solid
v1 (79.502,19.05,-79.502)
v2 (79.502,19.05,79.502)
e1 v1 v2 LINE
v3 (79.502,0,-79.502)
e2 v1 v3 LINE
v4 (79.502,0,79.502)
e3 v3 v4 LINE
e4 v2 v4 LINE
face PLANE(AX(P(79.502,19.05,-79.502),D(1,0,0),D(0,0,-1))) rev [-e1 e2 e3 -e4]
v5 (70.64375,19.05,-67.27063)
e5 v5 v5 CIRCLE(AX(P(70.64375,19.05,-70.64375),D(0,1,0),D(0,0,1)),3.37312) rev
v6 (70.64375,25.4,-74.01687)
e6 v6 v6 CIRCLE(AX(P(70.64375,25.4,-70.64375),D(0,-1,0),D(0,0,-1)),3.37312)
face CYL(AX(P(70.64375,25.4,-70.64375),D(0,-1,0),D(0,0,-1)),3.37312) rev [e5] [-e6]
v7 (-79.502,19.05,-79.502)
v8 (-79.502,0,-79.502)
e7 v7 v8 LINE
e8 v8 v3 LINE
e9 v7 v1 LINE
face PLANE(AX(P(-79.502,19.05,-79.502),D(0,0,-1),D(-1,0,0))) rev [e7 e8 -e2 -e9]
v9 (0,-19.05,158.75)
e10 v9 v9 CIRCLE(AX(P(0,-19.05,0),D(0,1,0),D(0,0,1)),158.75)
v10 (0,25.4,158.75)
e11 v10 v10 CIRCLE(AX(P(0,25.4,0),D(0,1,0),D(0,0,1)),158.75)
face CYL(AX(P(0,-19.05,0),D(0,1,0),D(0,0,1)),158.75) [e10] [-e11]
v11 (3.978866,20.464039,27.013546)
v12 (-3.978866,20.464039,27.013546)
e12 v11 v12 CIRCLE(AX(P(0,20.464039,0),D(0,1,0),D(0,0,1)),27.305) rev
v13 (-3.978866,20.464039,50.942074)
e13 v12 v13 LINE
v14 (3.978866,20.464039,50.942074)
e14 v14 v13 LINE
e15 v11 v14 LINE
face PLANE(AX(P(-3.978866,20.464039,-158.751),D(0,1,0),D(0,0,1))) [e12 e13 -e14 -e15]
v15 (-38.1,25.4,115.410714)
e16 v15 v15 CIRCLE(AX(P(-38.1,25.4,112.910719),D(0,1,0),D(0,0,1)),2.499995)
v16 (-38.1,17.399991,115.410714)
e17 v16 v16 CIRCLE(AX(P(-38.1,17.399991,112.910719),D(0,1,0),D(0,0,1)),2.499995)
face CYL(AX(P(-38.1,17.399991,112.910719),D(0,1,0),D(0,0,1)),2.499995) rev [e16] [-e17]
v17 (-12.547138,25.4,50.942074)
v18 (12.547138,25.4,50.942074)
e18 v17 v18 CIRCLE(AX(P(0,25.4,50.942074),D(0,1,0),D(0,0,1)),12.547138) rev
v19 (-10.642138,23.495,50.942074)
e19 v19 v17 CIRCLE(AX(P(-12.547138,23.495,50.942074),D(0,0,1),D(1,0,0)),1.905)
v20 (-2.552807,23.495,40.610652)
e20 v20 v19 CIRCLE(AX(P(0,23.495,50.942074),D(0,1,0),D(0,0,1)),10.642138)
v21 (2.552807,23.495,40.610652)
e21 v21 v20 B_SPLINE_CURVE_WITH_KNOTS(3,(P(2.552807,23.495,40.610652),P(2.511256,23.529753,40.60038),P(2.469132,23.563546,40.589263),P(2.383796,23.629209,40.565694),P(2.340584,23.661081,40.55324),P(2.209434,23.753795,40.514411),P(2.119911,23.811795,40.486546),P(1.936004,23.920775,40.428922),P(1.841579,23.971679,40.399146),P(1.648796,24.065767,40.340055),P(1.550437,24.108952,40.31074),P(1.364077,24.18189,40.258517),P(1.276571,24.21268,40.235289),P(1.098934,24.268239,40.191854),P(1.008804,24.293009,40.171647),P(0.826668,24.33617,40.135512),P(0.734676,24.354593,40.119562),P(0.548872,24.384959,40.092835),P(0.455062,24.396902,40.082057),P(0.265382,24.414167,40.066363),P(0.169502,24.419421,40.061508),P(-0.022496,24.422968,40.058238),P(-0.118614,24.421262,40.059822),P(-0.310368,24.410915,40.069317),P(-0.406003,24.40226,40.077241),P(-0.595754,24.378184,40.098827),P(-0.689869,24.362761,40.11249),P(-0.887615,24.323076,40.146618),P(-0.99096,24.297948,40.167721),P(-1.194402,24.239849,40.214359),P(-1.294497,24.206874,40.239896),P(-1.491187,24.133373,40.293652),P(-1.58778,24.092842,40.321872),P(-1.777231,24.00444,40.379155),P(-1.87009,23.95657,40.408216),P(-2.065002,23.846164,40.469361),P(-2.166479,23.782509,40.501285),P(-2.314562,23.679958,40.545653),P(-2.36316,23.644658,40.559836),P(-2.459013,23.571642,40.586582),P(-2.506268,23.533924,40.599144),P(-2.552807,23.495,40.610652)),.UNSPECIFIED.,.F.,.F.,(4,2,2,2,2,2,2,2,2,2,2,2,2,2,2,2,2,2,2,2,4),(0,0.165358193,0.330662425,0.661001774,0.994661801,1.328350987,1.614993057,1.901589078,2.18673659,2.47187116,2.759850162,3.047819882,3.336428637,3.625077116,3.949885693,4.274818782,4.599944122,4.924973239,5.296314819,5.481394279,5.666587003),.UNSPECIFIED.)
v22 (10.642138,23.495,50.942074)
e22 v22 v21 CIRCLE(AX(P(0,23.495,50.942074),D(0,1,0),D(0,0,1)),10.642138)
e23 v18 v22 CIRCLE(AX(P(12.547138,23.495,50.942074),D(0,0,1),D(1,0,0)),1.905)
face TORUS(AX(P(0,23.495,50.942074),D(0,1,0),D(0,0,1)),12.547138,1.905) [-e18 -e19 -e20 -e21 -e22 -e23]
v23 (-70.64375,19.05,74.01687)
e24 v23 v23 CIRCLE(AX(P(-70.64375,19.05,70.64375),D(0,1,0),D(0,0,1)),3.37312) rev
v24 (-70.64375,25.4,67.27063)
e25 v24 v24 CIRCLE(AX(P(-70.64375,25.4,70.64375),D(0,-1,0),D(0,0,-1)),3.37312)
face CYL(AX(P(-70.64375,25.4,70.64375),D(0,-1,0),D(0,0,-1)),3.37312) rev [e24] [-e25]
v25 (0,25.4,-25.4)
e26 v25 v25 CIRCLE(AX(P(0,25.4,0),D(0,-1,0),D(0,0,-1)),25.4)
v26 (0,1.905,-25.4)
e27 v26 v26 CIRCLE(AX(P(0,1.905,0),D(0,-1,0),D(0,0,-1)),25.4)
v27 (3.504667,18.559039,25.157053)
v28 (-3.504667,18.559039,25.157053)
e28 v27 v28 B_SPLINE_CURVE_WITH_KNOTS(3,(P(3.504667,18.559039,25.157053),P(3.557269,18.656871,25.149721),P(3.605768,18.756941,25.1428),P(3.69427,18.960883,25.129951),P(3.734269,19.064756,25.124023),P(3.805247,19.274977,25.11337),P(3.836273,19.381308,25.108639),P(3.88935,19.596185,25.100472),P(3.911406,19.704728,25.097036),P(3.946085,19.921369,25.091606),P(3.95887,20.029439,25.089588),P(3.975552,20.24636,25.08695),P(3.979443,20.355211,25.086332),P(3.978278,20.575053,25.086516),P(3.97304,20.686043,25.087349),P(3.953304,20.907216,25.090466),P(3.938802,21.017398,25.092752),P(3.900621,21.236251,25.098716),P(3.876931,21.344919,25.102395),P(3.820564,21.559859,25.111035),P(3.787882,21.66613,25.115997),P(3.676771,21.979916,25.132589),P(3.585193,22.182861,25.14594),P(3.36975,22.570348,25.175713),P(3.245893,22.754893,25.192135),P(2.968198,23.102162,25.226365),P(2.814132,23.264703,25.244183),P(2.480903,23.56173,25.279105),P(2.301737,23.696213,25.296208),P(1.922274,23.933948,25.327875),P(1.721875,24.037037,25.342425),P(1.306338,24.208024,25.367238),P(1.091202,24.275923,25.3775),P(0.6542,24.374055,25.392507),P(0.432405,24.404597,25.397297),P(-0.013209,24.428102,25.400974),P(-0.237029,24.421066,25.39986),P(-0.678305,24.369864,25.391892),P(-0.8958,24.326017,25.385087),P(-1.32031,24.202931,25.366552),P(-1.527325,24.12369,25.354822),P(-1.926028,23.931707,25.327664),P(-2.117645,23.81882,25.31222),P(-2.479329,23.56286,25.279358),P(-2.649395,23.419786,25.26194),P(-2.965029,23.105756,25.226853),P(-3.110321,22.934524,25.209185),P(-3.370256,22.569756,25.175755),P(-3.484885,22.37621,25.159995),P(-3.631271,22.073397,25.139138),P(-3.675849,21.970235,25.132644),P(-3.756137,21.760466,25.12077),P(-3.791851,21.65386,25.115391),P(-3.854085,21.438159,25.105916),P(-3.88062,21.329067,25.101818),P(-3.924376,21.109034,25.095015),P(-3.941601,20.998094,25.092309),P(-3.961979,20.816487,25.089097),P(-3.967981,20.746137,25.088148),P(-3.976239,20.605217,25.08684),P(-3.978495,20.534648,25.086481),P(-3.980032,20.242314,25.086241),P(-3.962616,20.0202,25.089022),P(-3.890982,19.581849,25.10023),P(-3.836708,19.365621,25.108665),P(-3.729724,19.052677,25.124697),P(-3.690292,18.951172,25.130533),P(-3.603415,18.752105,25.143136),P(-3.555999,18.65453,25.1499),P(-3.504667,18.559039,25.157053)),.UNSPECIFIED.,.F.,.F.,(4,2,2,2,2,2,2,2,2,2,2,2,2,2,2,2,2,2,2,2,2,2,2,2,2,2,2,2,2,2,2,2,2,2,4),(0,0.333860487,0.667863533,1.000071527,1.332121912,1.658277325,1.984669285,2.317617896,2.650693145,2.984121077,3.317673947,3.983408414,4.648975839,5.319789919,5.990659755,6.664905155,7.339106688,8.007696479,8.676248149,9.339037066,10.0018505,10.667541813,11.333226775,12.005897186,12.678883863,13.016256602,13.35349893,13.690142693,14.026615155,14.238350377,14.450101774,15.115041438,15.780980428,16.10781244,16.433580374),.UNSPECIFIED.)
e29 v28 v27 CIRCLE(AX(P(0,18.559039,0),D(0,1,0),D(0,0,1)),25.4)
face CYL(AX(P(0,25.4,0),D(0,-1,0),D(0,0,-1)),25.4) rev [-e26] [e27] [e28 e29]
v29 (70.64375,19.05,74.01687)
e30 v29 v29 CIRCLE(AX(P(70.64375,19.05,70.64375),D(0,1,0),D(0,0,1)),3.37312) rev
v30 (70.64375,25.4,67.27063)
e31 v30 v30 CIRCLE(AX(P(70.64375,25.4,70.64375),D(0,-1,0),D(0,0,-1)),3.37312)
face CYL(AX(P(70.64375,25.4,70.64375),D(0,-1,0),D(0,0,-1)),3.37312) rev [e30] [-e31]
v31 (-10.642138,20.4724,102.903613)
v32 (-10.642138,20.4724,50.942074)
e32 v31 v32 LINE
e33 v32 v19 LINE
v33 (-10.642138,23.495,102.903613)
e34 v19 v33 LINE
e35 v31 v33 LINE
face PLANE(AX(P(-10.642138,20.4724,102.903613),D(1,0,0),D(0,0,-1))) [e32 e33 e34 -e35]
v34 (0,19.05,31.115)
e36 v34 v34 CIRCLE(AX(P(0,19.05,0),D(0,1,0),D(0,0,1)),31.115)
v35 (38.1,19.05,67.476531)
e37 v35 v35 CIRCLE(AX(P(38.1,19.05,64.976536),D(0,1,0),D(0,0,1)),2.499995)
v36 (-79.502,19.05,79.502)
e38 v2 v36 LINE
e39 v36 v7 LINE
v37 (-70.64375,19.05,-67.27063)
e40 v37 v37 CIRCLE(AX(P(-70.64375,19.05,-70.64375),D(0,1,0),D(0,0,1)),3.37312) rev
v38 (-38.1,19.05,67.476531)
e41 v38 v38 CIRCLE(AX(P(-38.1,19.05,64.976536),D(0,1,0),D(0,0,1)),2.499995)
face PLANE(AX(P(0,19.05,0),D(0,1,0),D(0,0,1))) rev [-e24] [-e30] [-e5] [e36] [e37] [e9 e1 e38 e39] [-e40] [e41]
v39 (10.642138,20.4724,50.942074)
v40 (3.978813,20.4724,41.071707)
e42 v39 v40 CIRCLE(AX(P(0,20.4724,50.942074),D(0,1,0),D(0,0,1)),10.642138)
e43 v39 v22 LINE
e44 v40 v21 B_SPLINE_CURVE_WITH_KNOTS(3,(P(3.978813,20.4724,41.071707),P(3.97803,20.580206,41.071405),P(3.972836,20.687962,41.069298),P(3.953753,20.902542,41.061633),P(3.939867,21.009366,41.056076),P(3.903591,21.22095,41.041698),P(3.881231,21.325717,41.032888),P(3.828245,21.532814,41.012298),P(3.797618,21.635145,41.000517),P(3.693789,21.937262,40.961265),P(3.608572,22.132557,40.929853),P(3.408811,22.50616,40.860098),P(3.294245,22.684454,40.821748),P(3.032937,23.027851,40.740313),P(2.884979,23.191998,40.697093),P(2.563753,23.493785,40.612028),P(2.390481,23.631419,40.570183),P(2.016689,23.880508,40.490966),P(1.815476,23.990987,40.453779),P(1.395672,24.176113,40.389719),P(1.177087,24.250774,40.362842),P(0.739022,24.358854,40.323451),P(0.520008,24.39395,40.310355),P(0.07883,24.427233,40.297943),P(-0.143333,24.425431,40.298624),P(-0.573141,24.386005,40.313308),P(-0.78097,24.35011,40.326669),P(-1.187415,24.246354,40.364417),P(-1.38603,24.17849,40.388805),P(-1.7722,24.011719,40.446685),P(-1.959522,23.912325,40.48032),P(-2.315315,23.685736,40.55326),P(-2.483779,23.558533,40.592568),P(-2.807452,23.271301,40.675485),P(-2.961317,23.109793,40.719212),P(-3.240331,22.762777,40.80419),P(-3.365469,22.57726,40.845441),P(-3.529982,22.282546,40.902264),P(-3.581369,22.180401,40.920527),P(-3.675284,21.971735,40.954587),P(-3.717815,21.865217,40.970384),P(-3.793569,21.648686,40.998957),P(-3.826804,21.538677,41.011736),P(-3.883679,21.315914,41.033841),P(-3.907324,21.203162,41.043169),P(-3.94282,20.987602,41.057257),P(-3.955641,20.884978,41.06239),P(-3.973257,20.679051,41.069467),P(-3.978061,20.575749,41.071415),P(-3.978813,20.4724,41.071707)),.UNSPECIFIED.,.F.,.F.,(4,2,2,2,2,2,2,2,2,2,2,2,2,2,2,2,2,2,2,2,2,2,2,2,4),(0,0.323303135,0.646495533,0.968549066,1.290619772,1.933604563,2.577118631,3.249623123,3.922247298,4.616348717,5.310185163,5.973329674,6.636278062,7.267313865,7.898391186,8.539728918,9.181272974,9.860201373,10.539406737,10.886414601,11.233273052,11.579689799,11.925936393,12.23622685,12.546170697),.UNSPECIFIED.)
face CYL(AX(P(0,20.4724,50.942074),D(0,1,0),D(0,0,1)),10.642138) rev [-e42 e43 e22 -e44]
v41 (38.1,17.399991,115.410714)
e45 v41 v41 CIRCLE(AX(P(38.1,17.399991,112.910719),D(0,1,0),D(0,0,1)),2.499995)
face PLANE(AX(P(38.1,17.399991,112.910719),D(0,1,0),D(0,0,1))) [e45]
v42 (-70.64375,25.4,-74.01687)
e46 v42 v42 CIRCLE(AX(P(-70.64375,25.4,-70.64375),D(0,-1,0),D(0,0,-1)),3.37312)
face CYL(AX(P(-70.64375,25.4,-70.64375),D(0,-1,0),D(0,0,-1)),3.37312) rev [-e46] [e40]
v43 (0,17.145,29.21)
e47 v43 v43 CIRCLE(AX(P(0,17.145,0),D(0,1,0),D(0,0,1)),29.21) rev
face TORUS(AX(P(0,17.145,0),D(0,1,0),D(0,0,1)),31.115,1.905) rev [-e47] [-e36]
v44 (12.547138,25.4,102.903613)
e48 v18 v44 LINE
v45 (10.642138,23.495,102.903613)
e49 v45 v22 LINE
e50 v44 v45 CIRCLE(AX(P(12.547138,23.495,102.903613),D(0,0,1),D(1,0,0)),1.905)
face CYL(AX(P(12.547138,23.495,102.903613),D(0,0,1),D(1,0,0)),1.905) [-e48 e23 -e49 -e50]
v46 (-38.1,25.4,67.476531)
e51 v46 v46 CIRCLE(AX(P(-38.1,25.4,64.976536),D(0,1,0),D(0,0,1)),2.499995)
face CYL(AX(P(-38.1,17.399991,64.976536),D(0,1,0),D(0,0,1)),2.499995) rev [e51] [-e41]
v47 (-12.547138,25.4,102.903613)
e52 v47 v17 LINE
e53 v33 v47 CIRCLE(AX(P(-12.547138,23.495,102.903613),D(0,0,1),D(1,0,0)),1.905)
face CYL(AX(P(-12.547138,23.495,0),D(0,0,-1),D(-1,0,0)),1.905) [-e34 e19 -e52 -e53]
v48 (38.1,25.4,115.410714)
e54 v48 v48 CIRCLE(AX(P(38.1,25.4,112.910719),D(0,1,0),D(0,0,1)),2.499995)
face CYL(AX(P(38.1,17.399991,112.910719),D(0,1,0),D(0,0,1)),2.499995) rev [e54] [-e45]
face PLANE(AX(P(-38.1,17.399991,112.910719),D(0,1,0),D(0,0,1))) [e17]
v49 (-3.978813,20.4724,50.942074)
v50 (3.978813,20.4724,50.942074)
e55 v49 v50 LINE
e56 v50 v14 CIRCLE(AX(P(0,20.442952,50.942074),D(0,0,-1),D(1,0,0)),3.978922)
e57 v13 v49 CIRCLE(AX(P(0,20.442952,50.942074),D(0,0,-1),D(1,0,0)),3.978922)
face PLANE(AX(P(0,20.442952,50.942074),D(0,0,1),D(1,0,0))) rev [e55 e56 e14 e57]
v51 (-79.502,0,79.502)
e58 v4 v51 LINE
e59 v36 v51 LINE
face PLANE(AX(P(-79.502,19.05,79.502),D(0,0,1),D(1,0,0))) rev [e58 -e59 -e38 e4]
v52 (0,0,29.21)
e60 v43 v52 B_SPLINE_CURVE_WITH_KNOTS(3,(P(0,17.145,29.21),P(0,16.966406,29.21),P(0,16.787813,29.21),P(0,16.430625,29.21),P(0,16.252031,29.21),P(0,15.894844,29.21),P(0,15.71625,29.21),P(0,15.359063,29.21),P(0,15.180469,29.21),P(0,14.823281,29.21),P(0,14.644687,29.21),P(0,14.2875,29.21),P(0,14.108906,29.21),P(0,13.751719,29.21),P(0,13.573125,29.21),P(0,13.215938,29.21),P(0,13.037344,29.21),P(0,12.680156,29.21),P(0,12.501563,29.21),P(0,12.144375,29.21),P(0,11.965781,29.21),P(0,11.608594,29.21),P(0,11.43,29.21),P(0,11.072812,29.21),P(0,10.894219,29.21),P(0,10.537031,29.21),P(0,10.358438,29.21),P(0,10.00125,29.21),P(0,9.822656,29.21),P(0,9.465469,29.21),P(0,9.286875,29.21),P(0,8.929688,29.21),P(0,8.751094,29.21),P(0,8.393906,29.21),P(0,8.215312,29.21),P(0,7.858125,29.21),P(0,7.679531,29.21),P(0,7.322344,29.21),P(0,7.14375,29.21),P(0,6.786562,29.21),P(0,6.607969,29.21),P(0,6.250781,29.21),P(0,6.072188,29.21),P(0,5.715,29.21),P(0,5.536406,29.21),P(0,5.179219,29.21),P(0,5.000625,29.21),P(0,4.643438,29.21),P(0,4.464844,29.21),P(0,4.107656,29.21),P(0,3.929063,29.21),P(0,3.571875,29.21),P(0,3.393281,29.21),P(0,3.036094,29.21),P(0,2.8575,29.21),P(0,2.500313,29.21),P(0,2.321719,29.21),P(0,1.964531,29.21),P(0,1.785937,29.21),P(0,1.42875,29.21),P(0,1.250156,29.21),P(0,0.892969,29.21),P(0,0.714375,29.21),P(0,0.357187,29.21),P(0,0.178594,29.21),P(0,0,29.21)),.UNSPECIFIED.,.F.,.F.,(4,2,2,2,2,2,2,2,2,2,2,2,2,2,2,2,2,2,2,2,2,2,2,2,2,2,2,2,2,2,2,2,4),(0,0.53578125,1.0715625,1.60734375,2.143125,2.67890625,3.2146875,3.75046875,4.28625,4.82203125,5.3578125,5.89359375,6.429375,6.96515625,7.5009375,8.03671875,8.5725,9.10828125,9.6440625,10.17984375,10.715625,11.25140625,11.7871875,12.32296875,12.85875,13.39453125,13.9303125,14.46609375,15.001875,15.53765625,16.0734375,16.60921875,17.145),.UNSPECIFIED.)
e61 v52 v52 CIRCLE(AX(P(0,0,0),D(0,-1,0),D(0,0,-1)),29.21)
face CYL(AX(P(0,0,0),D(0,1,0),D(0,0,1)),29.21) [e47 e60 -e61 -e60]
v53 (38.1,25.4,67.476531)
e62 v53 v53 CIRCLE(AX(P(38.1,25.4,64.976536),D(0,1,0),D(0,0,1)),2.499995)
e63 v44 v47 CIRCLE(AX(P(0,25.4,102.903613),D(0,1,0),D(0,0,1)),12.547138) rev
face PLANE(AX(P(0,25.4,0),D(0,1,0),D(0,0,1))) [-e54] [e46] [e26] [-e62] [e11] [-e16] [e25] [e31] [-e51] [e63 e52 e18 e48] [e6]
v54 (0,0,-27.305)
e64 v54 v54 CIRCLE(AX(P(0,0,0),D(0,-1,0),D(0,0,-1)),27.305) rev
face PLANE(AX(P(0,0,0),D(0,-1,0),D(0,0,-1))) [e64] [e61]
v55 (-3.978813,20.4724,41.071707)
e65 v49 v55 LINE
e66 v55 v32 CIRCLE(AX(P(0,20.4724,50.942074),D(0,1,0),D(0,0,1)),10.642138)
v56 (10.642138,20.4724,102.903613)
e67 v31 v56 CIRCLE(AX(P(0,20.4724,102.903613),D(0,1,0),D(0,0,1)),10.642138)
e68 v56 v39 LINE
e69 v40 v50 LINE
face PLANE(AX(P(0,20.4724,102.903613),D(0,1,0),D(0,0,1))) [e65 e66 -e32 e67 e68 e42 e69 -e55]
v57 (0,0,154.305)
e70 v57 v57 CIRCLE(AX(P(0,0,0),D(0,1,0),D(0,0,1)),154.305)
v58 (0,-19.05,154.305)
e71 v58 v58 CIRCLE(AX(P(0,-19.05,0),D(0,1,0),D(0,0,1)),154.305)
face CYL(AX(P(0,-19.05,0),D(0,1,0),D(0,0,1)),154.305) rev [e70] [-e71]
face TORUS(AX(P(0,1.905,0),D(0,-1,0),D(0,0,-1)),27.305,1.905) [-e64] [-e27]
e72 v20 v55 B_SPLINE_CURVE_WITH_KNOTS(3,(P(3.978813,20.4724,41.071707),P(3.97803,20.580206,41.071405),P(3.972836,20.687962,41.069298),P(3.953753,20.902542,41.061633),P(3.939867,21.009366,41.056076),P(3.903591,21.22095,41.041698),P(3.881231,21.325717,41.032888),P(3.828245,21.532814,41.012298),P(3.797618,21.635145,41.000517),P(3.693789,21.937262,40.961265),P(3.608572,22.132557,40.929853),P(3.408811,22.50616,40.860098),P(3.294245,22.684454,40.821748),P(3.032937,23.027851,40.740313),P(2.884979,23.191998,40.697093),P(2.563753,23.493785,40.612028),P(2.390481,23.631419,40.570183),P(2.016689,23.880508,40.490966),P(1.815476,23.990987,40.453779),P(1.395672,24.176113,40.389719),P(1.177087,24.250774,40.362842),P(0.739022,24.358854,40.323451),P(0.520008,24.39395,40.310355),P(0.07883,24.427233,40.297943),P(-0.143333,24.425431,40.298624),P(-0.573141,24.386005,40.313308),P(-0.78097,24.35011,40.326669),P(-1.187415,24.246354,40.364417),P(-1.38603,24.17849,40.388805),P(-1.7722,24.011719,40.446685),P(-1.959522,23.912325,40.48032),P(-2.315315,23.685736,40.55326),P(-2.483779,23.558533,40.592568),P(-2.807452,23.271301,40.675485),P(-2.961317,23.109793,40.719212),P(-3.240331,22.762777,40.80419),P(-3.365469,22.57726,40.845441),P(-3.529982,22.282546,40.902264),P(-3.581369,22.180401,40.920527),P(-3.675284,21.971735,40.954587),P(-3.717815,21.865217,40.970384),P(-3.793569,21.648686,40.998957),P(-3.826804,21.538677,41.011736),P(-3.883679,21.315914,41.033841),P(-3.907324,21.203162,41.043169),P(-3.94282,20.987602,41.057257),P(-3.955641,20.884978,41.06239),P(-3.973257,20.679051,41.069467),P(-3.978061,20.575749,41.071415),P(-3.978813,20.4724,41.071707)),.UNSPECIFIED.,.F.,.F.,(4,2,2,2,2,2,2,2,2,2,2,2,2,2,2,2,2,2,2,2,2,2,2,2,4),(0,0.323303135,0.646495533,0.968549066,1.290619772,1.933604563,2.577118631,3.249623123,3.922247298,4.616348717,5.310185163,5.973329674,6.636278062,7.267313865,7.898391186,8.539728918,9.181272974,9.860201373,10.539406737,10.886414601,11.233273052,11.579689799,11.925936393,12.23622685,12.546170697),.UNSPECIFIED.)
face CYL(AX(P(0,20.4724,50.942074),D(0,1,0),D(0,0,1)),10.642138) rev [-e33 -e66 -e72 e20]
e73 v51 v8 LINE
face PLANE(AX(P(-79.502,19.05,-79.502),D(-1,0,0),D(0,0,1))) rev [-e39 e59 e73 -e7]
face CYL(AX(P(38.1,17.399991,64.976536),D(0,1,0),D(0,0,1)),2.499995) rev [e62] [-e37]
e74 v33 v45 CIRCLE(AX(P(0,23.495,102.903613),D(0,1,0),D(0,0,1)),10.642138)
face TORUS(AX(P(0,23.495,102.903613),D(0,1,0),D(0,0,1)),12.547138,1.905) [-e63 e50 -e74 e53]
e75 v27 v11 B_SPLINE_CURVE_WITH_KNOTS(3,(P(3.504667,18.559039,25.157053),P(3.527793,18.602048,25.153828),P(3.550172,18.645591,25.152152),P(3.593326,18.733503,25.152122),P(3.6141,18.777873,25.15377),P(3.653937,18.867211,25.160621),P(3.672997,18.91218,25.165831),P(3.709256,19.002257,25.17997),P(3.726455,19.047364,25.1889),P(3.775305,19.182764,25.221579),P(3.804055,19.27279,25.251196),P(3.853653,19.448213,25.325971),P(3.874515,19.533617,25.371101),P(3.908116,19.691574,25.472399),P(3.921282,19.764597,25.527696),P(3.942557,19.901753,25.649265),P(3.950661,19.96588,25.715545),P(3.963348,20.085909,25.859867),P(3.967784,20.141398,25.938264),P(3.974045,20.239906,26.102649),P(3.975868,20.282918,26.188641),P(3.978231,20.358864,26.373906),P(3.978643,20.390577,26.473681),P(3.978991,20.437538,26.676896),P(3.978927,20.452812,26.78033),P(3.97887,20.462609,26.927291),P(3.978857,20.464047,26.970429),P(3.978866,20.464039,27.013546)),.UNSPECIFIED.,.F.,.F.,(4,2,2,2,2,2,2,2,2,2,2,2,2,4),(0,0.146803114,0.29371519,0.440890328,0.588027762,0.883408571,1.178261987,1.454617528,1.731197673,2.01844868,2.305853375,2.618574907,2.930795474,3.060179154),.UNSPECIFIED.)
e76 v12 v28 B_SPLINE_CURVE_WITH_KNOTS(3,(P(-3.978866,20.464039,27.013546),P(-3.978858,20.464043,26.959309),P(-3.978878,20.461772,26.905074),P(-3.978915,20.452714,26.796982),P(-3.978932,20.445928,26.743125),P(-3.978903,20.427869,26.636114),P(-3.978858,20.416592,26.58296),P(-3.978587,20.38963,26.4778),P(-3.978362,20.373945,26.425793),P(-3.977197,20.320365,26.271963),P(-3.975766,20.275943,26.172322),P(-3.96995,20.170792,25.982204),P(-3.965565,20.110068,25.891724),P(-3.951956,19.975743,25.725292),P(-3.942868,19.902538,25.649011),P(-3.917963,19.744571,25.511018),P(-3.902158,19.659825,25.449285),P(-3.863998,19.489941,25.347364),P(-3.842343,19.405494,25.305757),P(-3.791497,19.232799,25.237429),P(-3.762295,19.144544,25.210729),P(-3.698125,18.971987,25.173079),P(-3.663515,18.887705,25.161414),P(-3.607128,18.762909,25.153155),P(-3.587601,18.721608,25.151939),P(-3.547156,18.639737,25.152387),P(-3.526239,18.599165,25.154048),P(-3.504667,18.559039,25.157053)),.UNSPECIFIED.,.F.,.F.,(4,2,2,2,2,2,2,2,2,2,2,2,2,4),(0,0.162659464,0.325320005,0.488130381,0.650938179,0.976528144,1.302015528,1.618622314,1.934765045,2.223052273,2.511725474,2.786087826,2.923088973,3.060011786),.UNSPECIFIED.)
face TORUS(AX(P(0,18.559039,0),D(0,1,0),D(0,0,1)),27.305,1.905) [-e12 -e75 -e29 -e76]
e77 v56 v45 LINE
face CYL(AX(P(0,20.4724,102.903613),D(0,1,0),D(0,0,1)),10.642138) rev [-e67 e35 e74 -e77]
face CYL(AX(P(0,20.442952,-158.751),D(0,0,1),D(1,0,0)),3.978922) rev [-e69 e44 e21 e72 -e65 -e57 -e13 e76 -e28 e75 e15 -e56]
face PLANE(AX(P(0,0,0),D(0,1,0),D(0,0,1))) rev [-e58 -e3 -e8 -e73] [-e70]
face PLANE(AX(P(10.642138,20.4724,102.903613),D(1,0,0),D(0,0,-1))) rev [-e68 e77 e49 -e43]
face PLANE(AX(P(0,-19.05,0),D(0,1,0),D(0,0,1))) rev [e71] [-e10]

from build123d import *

# Parameters (mm, degrees)
SKETCH1_R               = 154.305
BOSS_EXTRUDE1_DEPTH     = 25.4
SKETCH3_R               = 3.37312
CUT_EXTRUDE1_DEPTH      = 276.403891776
SKETCH5_R               = 25.4
CUT_EXTRUDE2_DEPTH      = 276.403891776
SKETCH6_W               = 159.004
SKETCH6_H               = 159.004
CUT_EXTRUDE3_DEPTH      = 19.05
BOSS_EXTRUDE2_START     = -19.05
SKETCH7_R               = 158.75
SKETCH7_R_2             = 154.305
BOSS_EXTRUDE2_DEPTH     = 44.45
CUT_EXTRUDE4_DEPTH      = 4.9276
CUT_EXTRUDE8_REACH      = 266.23
CUT_EXTRUDE8_END_RADIUS = 25.4
SKETCH11_R              = 2.499995
CUT_EXTRUDE9_DEPTH      = 8.0000094
BOSS_EXTRUDE3_START     = 19.05
SKETCH12_R              = 29.21
SKETCH12_R_2            = 25.4
BOSS_EXTRUDE3_DEPTH     = 19.05
FILLET1_R               = 1.905


with BuildPart() as part:
    # Sketch1 → Boss-Extrude1 (new body)
    with BuildSketch(Plane(origin=(0, 0, 0), x_dir=(1, 0, 0), z_dir=(0, 1, 0))):
        with Locations(Location((0, 0, 0), (0, 0, 270))):
            Circle(SKETCH1_R)
    extrude(amount=BOSS_EXTRUDE1_DEPTH)

    # Sketch3 → Cut-Extrude1 (cut, through all)
    with BuildSketch(Plane(origin=(3.2638069, 0, 70.137007426), x_dir=(-1, 0, 0), z_dir=(0, -1, 0))):
        with Locations(Location((-67.3799431, 140.780757426, 0), (0, 0, 90))):
            Circle(SKETCH3_R)
        with Locations(Location((73.9075569, 140.780757426, 0), (0, 0, 90))):
            Circle(SKETCH3_R)
        with Locations(Location((73.9075569, -0.506742574, 0), (0, 0, 90))):
            Circle(SKETCH3_R)
        with Locations(Location((-67.3799431, -0.506742574, 0), (0, 0, 90))):
            Circle(SKETCH3_R)
    extrude(amount=-CUT_EXTRUDE1_DEPTH, mode=Mode.SUBTRACT)

    # Sketch5 → Cut-Extrude2 (cut, through all)
    with BuildSketch(Plane(origin=(3.2638069, 0, 70.137007426), x_dir=(-1, 0, 0), z_dir=(0, -1, 0))):
        with Locations(Location((3.2638069, 70.137007426, 0), (0, 0, 90))):
            Circle(SKETCH5_R)
    extrude(amount=-CUT_EXTRUDE2_DEPTH, mode=Mode.SUBTRACT)

    # Sketch6 → Cut-Extrude3 (cut)
    with BuildSketch(Plane.XZ):
        Rectangle(SKETCH6_W, SKETCH6_H)
    extrude(amount=-CUT_EXTRUDE3_DEPTH, mode=Mode.SUBTRACT)

    # Sketch7 → Boss-Extrude2 (add)
    with BuildSketch(Plane(origin=(0, 0, 0), x_dir=(1, 0, 0), z_dir=(0, 1, 0)).offset(BOSS_EXTRUDE2_START)):
        with Locations(Location((0, 0, 0), (0, 0, 270))):
            Circle(SKETCH7_R)
        with Locations(Location((0, 0, 0), (0, 0, 270))):
            Circle(SKETCH7_R_2, mode=Mode.SUBTRACT)
    extrude(amount=BOSS_EXTRUDE2_DEPTH)

    # Sketch8 → Cut-Extrude4 (cut)
    with BuildSketch(Plane(origin=(0, 25.4, 0), x_dir=(1, 0, 0), z_dir=(0, 1, 0))):
        with BuildLine():
            Line((-10.642138235, -102.903613136), (-10.642138235, -50.942074053))
            ThreePointArc((-10.642138235, -50.942074053), (0, -40.299935817), (10.642138235, -50.942074053))
            Line((10.642138235, -50.942074053), (10.642138235, -102.903613136))
            ThreePointArc((10.642138235, -102.903613136), (0, -113.545751371), (-10.642138235, -102.903613136))
        make_face()
    extrude(amount=-CUT_EXTRUDE4_DEPTH, mode=Mode.SUBTRACT)

    # Cut-Extrude8: up to this cylinder (the profile starts outside it)
    cut_extrude8_end = Plane(origin=(0, 22.143059, 0), z_dir=(0, -1, 0)) * Cylinder(CUT_EXTRUDE8_END_RADIUS, 584.26, mode=Mode.PRIVATE)
    # Sketch10 → Cut-Extrude8 (cut, up to the surface)
    with BuildSketch(Plane(origin=(0, 0, 50.942074053), x_dir=(-1, 0, 0), z_dir=(0, 0, -1)), mode=Mode.PRIVATE) as cut_extrude8_sk1:
        with BuildLine():
            Line((3.978866006, 20.464038844), (-3.978866006, 20.464038844))
            ThreePointArc((-3.978866006, 20.464038844), (0, 24.421873778), (3.978866006, 20.464038844))
        make_face()
    cut_extrude8_tool1 = extrude(cut_extrude8_sk1.sketch, amount=CUT_EXTRUDE8_REACH, mode=Mode.PRIVATE) - cut_extrude8_end
    add(cut_extrude8_tool1.solids().sort_by_distance((0, 22.143059, 50.942074))[0], mode=Mode.SUBTRACT)

    # Sketch11 → Cut-Extrude9 (cut)
    with BuildSketch(Plane(origin=(0, 25.4, 0), x_dir=(1, 0, 0), z_dir=(0, 1, 0))):
        with Locations(Location((-38.1, -64.976536144, 0), (0, 0, 270))):
            Circle(SKETCH11_R)
        with Locations(Location((38.1, -64.976536144, 0), (0, 0, 270))):
            Circle(SKETCH11_R)
        with Locations(Location((38.1, -112.910719468, 0), (0, 0, 270))):
            Circle(SKETCH11_R)
        with Locations(Location((-38.1, -112.910719468, 0), (0, 0, 270))):
            Circle(SKETCH11_R)
    extrude(amount=-CUT_EXTRUDE9_DEPTH, mode=Mode.SUBTRACT)

    # Sketch12 → Boss-Extrude3 (add)
    with BuildSketch(Plane.XZ.offset(-19.05).offset(BOSS_EXTRUDE3_START)):
        with Locations(Location((0, 0, 0), (0, 0, 90))):
            Circle(SKETCH12_R)
        with Locations(Location((0, 0, 0), (0, 0, 270))):
            Circle(SKETCH12_R_2, mode=Mode.SUBTRACT)
    extrude(amount=-BOSS_EXTRUDE3_DEPTH)

    # Fillet1
    # the kernel refuses this fillet: 1.905 mm, written as the material it adds along each edge
    with BuildSketch(Plane(origin=(0, 19.05, 0), x_dir=(0, 0, 1), z_dir=(1, 0, 0))) as fillet1_piece_1:
        with BuildLine():
            CenterArc((29.21 + FILLET1_R, FILLET1_R), FILLET1_R, 180, 90)
            Line((29.21, FILLET1_R), (29.21, 0))
            Line((29.21, 0), (29.21 + FILLET1_R, 0))
        make_face()
    revolve(axis=Axis((0, 19.05, 0), (0, -1, 0)))
    # the kernel refuses this fillet: 1.905 mm, written as the material it takes off along each edge
    with BuildSketch(Plane(origin=(0, 0, 0), x_dir=(0, 0, -1), z_dir=(-1, 0, 0))) as fillet1_2_piece_1:
        with BuildLine():
            CenterArc((25.4 + FILLET1_R, -FILLET1_R), FILLET1_R, 90, 90)
            Line((25.4 + FILLET1_R, 0), (25.4, 0))
            Line((25.4, 0), (25.4, -FILLET1_R))
        make_face()
    revolve(axis=Axis((0, 0, 0), (0, -1, 0)), mode=Mode.SUBTRACT)
    with BuildSketch(Plane(origin=(-10.642138235, 25.4, 102.903613136), x_dir=(-1, 0, 0), z_dir=(0, 0, -1)), Plane(origin=(10.642138235, 25.4, 50.942074053), x_dir=(1, 0, 0), z_dir=(0, 0, 1))) as fillet1_2_piece_2:
        with BuildLine():
            CenterArc((FILLET1_R, -FILLET1_R), FILLET1_R, 90, 90)
            Line((0, -FILLET1_R), (0, 0))
            Line((0, 0), (FILLET1_R, 0))
        make_face()
    extrude(amount=51.961539084, mode=Mode.SUBTRACT)
    with BuildSketch(Plane(origin=(0, 25.4, 102.903613136), x_dir=(1, 0, 0), z_dir=(0, 0, -1))) as fillet1_2_piece_3:
        with BuildLine():
            CenterArc((10.642138235 + FILLET1_R, FILLET1_R), FILLET1_R, 180, 90)
            Line((10.642138235, FILLET1_R), (10.642138235, 0))
            Line((10.642138235, 0), (10.642138235 + FILLET1_R, 0))
        make_face()
    revolve(axis=Axis((0, 25.4, 102.903613136), (0, -1, 0)), revolution_arc=180, mode=Mode.SUBTRACT)
    with BuildSketch(Plane(origin=(0, 25.4, 50.942074053), x_dir=(-1, 0, 0), z_dir=(0, 0, 1))) as fillet1_2_piece_4:
        with BuildLine():
            CenterArc((10.642138235 + FILLET1_R, FILLET1_R), FILLET1_R, 180, 90)
            Line((10.642138235, FILLET1_R), (10.642138235, 0))
            Line((10.642138235, 0), (10.642138235 + FILLET1_R, 0))
        make_face()
    revolve(axis=Axis((0, 25.4, 50.942074053), (0, -1, 0)), revolution_arc=180, mode=Mode.SUBTRACT)
    with BuildSketch(Plane(origin=(0, 20.464038844, 0), x_dir=(0.33800763161773084, 0, 0.9411433689763598), z_dir=(0.9411433689763598, 0, -0.33800763161773084))) as fillet1_2_piece_5_section:
        with BuildLine():
            CenterArc((25.4 + FILLET1_R, FILLET1_R), FILLET1_R, 180, 90)
            Line((25.4 + FILLET1_R, 0), (25.4, 0))
            Line((25.4, 0), (25.4, FILLET1_R))
        make_face()
    fillet1_2_piece_5 = revolve(axis=Axis((0, 20.464038844, 0), (0, -1, 0)), revolution_arc=39.511069251, mode=Mode.PRIVATE)
    fillet1_2_piece_5 = fillet1_2_piece_5 & Plane(origin=(0, 20.442951895, 25.734088131), x_dir=(0.9999859566813862, 0.0052996641415057515, 0), z_dir=(0, 0, 1)) * Cylinder(3.978921884, 110, mode=Mode.PRIVATE)
    add(fillet1_2_piece_5, mode=Mode.SUBTRACT)


solid = part.part
